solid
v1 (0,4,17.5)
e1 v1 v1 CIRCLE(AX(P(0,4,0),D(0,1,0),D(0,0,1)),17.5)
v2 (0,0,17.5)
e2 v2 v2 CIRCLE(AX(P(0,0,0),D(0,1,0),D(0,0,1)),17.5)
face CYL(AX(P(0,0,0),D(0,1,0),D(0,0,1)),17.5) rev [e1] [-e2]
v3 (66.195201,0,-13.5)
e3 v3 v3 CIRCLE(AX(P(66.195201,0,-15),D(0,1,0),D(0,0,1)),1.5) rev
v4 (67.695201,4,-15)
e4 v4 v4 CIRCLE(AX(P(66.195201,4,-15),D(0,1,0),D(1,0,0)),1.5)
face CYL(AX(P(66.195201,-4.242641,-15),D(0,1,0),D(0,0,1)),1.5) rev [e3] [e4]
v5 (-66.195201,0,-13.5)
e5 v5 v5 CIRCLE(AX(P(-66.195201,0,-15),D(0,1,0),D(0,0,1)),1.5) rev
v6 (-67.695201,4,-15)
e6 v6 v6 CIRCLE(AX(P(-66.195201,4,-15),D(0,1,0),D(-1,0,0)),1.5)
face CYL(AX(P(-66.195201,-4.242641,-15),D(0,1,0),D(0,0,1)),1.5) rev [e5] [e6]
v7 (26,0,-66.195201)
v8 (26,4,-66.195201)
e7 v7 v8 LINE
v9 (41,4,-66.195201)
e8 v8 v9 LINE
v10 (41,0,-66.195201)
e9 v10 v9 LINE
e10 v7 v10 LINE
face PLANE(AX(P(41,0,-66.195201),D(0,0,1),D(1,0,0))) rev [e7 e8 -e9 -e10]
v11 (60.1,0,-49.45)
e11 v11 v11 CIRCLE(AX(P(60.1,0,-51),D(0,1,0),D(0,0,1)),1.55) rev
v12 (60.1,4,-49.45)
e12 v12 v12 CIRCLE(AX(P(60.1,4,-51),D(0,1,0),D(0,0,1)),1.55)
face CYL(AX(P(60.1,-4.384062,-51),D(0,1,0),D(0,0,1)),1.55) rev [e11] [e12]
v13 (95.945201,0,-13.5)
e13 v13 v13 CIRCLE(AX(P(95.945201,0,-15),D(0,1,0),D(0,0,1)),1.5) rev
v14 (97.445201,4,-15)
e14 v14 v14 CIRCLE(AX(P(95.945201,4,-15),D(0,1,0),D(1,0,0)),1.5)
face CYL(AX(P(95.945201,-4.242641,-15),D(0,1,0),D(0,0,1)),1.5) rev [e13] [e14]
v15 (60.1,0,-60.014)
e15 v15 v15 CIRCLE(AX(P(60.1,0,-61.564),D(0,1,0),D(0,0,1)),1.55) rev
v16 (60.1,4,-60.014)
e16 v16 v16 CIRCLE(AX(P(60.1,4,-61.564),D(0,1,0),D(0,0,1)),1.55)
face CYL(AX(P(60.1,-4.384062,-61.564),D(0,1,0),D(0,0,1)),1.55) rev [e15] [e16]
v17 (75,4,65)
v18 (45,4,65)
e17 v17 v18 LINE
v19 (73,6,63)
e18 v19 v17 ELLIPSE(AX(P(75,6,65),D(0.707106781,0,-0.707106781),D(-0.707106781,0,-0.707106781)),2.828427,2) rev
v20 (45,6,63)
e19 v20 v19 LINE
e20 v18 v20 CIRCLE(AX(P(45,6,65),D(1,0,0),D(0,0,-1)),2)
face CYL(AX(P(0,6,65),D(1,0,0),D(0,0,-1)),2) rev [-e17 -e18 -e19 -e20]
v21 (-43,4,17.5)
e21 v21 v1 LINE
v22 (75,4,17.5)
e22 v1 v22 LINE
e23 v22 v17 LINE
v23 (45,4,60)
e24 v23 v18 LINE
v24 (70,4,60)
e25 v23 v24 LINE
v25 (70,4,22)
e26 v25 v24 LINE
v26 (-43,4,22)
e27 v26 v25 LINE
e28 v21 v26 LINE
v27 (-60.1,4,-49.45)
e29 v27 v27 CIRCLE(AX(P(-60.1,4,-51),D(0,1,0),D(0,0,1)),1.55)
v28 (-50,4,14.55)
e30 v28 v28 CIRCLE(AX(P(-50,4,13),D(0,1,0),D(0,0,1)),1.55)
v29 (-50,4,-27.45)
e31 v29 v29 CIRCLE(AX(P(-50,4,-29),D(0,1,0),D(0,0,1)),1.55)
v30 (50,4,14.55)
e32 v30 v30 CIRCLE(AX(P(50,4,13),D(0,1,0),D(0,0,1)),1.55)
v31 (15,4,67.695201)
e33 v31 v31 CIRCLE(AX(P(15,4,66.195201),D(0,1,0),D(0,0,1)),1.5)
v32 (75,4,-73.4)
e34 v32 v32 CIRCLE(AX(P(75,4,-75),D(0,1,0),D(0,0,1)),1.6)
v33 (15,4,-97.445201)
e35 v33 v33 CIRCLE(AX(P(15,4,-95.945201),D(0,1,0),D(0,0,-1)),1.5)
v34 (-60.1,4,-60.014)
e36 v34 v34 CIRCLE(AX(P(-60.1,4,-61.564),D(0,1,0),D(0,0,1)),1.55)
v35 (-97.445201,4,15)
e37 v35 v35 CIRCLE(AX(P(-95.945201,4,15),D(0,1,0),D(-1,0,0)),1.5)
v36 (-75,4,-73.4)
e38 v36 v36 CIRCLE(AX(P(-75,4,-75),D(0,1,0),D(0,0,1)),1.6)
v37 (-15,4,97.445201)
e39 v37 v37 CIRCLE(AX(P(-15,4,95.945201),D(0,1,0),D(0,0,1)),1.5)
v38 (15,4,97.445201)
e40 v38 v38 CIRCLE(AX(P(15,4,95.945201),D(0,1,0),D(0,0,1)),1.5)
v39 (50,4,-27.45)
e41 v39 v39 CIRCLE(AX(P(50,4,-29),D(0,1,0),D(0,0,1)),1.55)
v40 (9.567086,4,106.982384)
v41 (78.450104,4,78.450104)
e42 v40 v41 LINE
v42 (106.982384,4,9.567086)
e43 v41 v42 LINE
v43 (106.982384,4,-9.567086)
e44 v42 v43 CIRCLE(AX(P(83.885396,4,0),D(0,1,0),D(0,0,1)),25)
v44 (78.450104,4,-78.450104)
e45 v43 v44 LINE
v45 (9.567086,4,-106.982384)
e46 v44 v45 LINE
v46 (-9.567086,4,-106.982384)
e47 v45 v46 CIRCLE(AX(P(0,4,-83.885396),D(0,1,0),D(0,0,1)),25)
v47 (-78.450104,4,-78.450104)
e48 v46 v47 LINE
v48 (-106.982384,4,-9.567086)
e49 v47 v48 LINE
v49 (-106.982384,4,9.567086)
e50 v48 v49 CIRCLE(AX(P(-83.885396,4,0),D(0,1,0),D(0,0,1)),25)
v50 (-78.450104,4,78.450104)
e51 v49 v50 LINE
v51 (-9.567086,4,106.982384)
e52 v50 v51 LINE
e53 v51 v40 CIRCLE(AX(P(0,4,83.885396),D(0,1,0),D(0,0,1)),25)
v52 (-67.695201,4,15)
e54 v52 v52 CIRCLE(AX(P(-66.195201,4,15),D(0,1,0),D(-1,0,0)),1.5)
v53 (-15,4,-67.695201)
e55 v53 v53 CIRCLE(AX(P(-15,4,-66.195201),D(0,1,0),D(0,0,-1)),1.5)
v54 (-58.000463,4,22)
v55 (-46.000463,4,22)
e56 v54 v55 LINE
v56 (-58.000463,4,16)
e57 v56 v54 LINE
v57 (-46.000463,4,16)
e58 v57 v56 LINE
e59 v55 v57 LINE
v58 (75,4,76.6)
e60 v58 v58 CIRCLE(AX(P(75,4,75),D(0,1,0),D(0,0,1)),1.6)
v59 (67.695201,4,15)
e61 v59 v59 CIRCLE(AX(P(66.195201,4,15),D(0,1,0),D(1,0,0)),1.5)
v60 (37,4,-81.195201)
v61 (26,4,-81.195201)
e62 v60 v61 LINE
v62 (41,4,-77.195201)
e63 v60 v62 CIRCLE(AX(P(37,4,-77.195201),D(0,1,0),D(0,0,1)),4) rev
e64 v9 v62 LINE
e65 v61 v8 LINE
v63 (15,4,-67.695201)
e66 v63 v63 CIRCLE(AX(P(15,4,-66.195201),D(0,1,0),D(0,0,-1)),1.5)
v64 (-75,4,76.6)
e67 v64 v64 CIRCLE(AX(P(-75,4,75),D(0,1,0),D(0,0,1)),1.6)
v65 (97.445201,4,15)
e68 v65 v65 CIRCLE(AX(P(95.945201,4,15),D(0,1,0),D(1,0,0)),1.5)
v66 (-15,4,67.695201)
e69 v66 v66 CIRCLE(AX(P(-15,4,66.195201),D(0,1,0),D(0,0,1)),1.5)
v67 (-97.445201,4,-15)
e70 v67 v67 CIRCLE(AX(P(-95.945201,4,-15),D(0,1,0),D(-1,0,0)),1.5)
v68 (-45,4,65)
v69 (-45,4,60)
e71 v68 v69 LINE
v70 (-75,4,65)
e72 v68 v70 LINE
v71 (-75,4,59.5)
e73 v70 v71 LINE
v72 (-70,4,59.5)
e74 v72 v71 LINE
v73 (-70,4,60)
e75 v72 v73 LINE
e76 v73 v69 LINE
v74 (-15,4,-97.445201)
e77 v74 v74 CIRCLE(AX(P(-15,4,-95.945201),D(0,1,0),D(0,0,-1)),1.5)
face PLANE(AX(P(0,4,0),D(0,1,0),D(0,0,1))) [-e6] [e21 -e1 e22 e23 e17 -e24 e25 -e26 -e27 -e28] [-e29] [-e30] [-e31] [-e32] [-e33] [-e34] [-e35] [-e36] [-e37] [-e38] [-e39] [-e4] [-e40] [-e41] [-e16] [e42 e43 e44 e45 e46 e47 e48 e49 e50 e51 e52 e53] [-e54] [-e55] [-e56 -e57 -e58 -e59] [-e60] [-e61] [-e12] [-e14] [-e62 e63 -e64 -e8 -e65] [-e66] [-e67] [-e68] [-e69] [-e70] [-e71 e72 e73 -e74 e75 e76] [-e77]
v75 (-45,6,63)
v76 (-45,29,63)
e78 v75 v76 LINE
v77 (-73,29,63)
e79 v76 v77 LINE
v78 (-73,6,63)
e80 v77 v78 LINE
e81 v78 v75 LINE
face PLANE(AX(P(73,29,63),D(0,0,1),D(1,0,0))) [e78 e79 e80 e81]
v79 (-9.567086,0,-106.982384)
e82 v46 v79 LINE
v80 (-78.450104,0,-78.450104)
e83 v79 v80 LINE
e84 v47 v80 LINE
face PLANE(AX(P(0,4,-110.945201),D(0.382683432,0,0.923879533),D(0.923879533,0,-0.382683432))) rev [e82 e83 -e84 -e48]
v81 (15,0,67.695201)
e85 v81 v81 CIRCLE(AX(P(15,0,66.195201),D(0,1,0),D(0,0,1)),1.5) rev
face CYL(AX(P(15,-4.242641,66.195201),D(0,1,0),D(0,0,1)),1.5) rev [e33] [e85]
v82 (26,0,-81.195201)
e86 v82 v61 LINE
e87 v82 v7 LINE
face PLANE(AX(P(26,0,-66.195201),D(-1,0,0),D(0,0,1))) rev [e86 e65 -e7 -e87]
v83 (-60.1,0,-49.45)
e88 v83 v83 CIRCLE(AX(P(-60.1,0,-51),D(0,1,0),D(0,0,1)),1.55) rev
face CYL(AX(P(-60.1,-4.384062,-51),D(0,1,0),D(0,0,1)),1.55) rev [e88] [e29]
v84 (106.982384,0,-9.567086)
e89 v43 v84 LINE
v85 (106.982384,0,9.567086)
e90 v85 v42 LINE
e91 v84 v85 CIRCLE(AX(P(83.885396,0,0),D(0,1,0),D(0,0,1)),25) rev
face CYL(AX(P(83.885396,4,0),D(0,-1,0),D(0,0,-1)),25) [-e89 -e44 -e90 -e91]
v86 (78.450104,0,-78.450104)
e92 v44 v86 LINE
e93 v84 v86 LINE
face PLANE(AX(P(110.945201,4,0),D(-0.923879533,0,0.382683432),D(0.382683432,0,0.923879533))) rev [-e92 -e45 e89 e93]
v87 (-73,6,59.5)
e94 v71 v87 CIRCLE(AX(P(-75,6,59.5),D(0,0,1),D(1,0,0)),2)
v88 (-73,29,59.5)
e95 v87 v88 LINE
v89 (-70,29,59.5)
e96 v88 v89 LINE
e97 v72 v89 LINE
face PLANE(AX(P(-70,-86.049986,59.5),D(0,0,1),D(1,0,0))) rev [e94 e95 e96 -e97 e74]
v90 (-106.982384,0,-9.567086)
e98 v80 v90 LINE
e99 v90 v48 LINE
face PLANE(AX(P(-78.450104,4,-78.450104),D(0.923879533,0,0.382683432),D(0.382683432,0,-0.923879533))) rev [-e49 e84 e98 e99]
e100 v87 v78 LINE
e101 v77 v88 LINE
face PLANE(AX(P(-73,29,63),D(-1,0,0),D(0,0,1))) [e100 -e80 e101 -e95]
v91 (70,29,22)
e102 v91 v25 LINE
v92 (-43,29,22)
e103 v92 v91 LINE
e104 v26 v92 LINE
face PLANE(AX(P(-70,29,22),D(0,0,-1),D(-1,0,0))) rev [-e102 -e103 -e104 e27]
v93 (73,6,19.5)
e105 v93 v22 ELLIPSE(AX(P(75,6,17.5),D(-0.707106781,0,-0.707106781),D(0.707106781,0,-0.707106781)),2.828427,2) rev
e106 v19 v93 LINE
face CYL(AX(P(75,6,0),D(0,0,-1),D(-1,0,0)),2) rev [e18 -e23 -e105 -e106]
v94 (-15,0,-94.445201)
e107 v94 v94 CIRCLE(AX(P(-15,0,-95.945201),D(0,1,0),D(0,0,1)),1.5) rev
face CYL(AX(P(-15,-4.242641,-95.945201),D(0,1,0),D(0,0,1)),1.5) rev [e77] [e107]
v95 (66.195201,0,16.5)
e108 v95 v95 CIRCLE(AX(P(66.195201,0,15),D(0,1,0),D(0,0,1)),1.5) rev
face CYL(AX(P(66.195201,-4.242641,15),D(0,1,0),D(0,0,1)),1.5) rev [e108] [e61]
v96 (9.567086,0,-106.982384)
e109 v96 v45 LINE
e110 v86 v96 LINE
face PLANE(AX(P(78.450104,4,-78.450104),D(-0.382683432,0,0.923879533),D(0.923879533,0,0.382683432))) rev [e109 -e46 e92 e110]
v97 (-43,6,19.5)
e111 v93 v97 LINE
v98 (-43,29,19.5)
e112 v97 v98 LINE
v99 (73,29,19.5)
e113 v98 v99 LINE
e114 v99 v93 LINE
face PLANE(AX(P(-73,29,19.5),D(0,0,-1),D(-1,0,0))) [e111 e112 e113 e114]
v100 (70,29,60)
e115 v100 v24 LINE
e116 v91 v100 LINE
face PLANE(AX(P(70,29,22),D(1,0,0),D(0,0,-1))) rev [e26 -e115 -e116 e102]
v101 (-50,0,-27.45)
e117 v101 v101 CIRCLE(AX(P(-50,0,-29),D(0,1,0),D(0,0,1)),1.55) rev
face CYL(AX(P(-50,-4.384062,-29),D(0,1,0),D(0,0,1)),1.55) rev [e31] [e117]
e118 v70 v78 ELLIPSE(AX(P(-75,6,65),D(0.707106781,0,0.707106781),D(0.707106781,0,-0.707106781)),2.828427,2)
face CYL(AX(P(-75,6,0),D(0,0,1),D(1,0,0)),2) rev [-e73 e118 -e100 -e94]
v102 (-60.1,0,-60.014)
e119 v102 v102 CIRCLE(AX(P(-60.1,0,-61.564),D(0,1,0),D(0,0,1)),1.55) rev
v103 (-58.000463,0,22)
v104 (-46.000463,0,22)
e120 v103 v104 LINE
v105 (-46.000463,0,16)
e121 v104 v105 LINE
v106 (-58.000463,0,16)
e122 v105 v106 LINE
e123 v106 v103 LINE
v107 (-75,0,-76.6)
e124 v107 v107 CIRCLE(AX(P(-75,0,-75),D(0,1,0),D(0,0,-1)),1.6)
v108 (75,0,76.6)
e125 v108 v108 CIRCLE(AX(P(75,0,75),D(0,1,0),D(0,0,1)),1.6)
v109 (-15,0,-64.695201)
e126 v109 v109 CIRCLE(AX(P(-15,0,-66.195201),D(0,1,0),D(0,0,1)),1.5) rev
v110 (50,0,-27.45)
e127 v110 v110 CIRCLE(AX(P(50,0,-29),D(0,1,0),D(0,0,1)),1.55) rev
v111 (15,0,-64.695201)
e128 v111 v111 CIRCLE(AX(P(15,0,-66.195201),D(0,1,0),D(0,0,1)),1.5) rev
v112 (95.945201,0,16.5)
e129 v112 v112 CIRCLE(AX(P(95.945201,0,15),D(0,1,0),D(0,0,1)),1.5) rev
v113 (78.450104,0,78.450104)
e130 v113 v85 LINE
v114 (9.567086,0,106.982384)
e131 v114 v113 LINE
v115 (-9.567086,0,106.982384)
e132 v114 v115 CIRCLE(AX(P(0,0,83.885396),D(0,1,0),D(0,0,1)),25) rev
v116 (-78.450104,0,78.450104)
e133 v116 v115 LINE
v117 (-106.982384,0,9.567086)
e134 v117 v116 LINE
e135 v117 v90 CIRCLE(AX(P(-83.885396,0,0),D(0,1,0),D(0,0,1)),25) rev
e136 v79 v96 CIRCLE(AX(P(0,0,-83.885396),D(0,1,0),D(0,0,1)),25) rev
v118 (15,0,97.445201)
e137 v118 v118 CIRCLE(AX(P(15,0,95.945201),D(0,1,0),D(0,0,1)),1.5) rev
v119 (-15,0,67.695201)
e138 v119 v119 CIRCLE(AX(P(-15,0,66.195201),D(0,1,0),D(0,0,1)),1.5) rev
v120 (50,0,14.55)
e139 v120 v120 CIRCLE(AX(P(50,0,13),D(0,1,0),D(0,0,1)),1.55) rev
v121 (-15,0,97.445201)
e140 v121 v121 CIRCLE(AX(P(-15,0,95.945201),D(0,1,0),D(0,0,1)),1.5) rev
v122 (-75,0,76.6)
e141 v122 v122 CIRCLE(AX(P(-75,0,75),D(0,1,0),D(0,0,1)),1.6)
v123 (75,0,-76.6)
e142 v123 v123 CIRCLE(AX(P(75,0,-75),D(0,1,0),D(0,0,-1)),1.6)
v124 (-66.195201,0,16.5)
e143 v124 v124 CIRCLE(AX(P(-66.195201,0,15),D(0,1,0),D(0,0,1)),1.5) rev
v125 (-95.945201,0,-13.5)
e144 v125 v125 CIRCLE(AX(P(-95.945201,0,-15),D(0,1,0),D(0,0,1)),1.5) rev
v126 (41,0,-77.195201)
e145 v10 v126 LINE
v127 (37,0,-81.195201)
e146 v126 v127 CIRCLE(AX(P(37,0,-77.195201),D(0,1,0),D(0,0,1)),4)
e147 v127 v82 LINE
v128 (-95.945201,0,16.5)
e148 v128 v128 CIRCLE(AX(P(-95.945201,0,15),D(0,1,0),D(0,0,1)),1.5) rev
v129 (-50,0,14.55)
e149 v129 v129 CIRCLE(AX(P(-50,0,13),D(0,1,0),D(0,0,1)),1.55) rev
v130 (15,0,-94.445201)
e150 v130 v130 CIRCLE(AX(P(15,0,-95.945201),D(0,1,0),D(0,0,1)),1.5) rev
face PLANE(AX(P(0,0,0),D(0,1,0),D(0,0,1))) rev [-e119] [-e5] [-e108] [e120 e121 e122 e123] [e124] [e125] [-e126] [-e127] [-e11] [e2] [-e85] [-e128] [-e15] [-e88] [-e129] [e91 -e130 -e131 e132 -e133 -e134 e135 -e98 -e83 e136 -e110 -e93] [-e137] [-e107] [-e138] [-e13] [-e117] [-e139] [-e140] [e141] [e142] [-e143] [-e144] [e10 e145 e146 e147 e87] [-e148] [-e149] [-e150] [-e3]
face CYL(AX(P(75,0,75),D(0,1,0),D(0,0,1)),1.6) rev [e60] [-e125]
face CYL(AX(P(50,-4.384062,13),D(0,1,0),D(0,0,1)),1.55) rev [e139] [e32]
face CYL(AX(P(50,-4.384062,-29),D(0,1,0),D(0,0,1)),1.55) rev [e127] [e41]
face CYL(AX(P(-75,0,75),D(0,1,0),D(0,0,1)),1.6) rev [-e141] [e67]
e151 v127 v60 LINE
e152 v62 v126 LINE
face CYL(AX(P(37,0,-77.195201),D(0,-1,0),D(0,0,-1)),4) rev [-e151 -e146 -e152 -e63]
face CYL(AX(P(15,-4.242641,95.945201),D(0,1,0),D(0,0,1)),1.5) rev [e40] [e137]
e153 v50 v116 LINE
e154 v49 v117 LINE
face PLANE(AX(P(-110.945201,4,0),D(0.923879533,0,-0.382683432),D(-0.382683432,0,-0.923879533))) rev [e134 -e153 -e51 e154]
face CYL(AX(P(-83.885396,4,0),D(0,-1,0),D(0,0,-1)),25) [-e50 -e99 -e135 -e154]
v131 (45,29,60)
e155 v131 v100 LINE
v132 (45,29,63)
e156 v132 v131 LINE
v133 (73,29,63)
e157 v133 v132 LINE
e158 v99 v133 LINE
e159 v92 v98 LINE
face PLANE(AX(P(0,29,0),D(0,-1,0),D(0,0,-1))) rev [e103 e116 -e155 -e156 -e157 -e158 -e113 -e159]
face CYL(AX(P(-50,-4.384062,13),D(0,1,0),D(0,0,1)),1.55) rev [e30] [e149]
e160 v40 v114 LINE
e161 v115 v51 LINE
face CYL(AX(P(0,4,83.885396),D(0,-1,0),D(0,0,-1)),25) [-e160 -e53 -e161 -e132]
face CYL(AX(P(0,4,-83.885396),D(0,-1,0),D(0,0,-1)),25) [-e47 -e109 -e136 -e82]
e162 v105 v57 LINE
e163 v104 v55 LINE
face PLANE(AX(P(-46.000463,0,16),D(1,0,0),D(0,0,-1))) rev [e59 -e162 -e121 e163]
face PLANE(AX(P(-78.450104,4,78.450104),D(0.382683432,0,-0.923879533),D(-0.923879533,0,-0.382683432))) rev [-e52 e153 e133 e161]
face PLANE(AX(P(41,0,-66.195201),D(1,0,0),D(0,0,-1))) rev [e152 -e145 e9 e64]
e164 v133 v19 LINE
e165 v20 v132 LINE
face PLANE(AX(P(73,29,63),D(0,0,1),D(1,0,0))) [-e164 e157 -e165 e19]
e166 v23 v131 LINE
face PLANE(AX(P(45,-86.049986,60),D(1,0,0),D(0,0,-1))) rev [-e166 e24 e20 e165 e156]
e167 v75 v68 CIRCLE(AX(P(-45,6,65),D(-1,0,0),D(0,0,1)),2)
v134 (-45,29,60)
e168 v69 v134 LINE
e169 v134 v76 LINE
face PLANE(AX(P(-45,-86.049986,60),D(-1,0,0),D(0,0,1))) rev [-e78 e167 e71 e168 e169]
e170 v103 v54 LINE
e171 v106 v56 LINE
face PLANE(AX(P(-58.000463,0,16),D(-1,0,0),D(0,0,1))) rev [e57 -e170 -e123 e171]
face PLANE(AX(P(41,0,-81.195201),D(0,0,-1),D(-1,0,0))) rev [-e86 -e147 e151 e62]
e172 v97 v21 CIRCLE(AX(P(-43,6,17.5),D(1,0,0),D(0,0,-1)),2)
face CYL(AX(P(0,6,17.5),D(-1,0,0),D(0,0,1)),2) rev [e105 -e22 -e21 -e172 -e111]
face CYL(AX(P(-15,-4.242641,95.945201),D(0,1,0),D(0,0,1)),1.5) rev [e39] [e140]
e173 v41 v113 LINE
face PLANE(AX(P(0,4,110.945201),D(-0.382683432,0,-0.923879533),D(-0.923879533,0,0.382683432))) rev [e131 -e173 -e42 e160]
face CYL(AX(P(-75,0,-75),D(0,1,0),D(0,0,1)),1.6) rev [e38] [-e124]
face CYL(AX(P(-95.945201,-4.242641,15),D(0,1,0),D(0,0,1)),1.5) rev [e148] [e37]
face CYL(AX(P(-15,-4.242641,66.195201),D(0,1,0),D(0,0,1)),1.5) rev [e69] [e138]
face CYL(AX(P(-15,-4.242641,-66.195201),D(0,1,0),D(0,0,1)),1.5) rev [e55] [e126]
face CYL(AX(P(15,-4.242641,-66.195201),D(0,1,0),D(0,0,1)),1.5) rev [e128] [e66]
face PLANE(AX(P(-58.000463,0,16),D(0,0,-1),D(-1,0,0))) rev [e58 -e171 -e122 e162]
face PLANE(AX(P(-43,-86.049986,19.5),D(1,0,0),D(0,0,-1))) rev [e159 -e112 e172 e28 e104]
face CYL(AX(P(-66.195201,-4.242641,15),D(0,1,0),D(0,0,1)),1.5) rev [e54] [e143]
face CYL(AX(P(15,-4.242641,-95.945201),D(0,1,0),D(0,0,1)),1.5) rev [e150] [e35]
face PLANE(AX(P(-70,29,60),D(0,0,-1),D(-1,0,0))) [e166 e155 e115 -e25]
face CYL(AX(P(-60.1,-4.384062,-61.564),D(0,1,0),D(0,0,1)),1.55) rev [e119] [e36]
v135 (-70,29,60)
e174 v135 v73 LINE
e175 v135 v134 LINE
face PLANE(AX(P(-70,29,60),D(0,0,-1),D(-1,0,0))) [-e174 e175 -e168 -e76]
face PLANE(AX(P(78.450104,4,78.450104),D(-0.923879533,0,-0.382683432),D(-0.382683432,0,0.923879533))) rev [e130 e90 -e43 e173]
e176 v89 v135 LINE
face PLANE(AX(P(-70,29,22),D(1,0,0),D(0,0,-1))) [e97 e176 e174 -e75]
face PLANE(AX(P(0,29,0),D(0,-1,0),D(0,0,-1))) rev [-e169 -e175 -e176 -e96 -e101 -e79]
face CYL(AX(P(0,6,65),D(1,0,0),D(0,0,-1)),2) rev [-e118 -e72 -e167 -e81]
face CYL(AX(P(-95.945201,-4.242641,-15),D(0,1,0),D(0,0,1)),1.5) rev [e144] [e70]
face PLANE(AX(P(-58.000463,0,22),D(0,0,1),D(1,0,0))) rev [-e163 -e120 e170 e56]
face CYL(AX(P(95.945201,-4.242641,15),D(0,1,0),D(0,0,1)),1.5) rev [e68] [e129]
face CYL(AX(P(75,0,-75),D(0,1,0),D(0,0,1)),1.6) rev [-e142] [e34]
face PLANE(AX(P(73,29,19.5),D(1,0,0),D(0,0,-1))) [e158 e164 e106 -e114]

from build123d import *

# Parameters (mm, degrees)
BOSS_EXTRUDE2_DEPTH      = 4
CUT_EXTRUDE3_DEPTH       = 157.951186811
CUT_EXTRUDE3_DEPTH_BACK  = 157.951186811
SKETCH3_R                = 1.6
CUT_EXTRUDE6_DEPTH       = 157.951186811
CUT_EXTRUDE6_DEPTH_BACK  = 157.951186811
SKETCH6_R                = 17.5
SKETCH8_R                = 1.5
CUT_EXTRUDE7_DEPTH       = 4
CIRPATTERN1_COUNT        = 4
SKETCH10_R               = 1.55
CUT_EXTRUDE8_DEPTH       = 4
SKETCH11_W               = 146
SKETCH11_H               = 43.5
SKETCH11_W_2             = 140
SKETCH11_H_2             = 38
BOSS_EXTRUDE4_DEPTH      = 25
SKETCH12_W               = 90
SKETCH12_H               = 3
CUT_EXTRUDE9_DEPTH       = 25
FILLET1_R                = 2
SKETCH19_W               = 12
SKETCH19_H               = 6
CUT_EXTRUDE11_DEPTH      = 159.879435552
CUT_EXTRUDE12_DEPTH      = 159.879435552
CUT_EXTRUDE12_DEPTH_BACK = 159.879435552
SKETCH20_W               = 15
SKETCH20_H               = 15
FILLET2_R                = 25
FILLET3_R                = 4


with BuildPart() as part:
    # Sketch1 → Boss-Extrude2 (new body)
    with BuildSketch(Plane(origin=(0, 0, 0), x_dir=(1, 0, 0), z_dir=(0, 1, 0))):
        Polygon((0, -110.94520053), (78.450103635, -78.450103635), (110.94520053, 0), (78.450103635, 78.450103635), (0, 110.94520053), (-78.450103635, 78.450103635), (-110.94520053, 0), (-78.450103635, -78.450103635), align=None)
    extrude(amount=BOSS_EXTRUDE2_DEPTH)

    # Sketch3 → Cut-Extrude3 (cut, two sides: drawn at the far end of the back side and taken through both)
    with BuildSketch(Plane(origin=(0, 4, 0), x_dir=(1, 0, 0), z_dir=(0, 1, 0)).offset(-CUT_EXTRUDE3_DEPTH_BACK)):
        with Locations(Location((-75, -75, 0), (0, 0, 270))):
            Circle(SKETCH3_R)
        with Locations(Location((75, -75, 0), (0, 0, 270))):
            Circle(SKETCH3_R)
        with Locations(Location((75, 75, 0), (0, 0, 270))):
            Circle(SKETCH3_R)
        with Locations(Location((-75, 75, 0), (0, 0, 270))):
            Circle(SKETCH3_R)
    extrude(amount=CUT_EXTRUDE3_DEPTH + CUT_EXTRUDE3_DEPTH_BACK, mode=Mode.SUBTRACT)

    # Sketch6 → Cut-Extrude6 (cut, two sides: drawn at the far end of the back side and taken through both)
    with BuildSketch(Plane(origin=(0, 4, 0), x_dir=(1, 0, 0), z_dir=(0, 1, 0)).offset(-CUT_EXTRUDE6_DEPTH_BACK)):
        with Locations(Location((0, 0, 0), (0, 0, 270))):
            Circle(SKETCH6_R)
    extrude(amount=CUT_EXTRUDE6_DEPTH + CUT_EXTRUDE6_DEPTH_BACK, mode=Mode.SUBTRACT)

    # Sketch8 → Cut-Extrude7 (cut)
    with BuildSketch(Plane(origin=(0, 4, 0), x_dir=(1, 0, 0), z_dir=(0, 1, 0))):
        with Locations(Location((-15, -66.19520053, 0), (0, 0, 270))):
            Circle(SKETCH8_R)
        with Locations(Location((15, -66.19520053, 0), (0, 0, 270))):
            Circle(SKETCH8_R)
        with Locations(Location((-15, -95.94520053, 0), (0, 0, 270))):
            Circle(SKETCH8_R)
        with Locations(Location((15, -95.94520053, 0), (0, 0, 270))):
            Circle(SKETCH8_R)
    cut_extrude7 = extrude(amount=-CUT_EXTRUDE7_DEPTH, mode=Mode.SUBTRACT)

    # CirPattern1: Cut-Extrude7 ×4 about axis
    cirpattern1_axis = Axis((0, 0, 0), (0, 1, 0))
    for i in range(1, CIRPATTERN1_COUNT):
        add(cut_extrude7.rotate(cirpattern1_axis, i * 360 / CIRPATTERN1_COUNT), mode=Mode.SUBTRACT)

    # Sketch10 → Cut-Extrude8 (cut)
    with BuildSketch(Plane(origin=(0, 4, 0), x_dir=(1, 0, 0), z_dir=(0, 1, 0))):
        with Locations(Location((-50, 29, 0), (0, 0, 270))):
            Circle(SKETCH10_R)
        with Locations(Location((-50, -13, 0), (0, 0, 270))):
            Circle(SKETCH10_R)
        with Locations(Location((50, -13, 0), (0, 0, 270))):
            Circle(SKETCH10_R)
        with Locations(Location((50, 29, 0), (0, 0, 270))):
            Circle(SKETCH10_R)
        with Locations(Location((60.1, 51, 0), (0, 0, 270))):
            Circle(SKETCH10_R)
        with Locations(Location((-60.1, 61.564, 0), (0, 0, 270))):
            Circle(SKETCH10_R)
        with Locations(Location((60.1, 61.564, 0), (0, 0, 270))):
            Circle(SKETCH10_R)
        with Locations(Location((-60.1, 51, 0), (0, 0, 270))):
            Circle(SKETCH10_R)
    extrude(amount=-CUT_EXTRUDE8_DEPTH, mode=Mode.SUBTRACT)

    # Sketch11 → Boss-Extrude4 (add)
    with BuildSketch(Plane(origin=(0, 4, 0), x_dir=(1, 0, 0), z_dir=(0, 1, 0))):
        with Locations((0, -41.25)):
            Rectangle(SKETCH11_W, SKETCH11_H)
        with Locations((0, -41)):
            Rectangle(SKETCH11_W_2, SKETCH11_H_2, mode=Mode.SUBTRACT)
    extrude(amount=BOSS_EXTRUDE4_DEPTH)

    # Sketch12 → Cut-Extrude9 (cut)
    with BuildSketch(Plane(origin=(0, 29, 0), x_dir=(1, 0, 0), z_dir=(0, 1, 0))):
        Polygon((-73, -19.5), (-43, -19.5), (-43, -22), (-70, -22), (-70, -59.5), (-73, -59.5), align=None)
        with Locations((0, -61.5)):
            Rectangle(SKETCH12_W, SKETCH12_H)
    extrude(amount=-CUT_EXTRUDE9_DEPTH, mode=Mode.SUBTRACT)

    # Fillet1
    fillet1_edges = [part.edges().sort_by_distance(p)[0] for p in [
        (59, 4, 63),
        (-73, 4, 61.25),
        (73, 4, 41.25),
        (15, 4, 19.5),
        (-59, 4, 63),
    ]]
    fillet(fillet1_edges, radius=FILLET1_R - 0.0001)  # a hair under: the kernel refuses the full size

    # Sketch19 → Cut-Extrude11 (cut, through all)
    with BuildSketch(Plane(origin=(0, 4, 0), x_dir=(1, 0, 0), z_dir=(0, 1, 0))):
        with Locations((-52.000462783, -19)):
            Rectangle(SKETCH19_W, SKETCH19_H)
    extrude(amount=-CUT_EXTRUDE11_DEPTH, mode=Mode.SUBTRACT)

    # Sketch20 → Cut-Extrude12 (cut, two sides: drawn at the far end of the back side and taken through both)
    with BuildSketch(Plane(origin=(0, 4, 0), x_dir=(1, 0, 0), z_dir=(0, 1, 0)).offset(-CUT_EXTRUDE12_DEPTH_BACK)):
        with Locations((33.5, 73.69520053)):
            Rectangle(SKETCH20_W, SKETCH20_H)
    extrude(amount=CUT_EXTRUDE12_DEPTH + CUT_EXTRUDE12_DEPTH_BACK, mode=Mode.SUBTRACT)

    # Fillet2
    fillet2_edges = [part.edges().sort_by_distance(p)[0] for p in [
        (-110.94520053, 2, 0),
        (0, 2, -110.94520053),
        (110.94520053, 2, 0),
        (0, 2, 110.94520053),
    ]]
    fillet(fillet2_edges, radius=FILLET2_R)

    # Fillet3
    fillet3_edges = [part.edges().sort_by_distance(p)[0] for p in [
        (41, 2, -81.19520053),
    ]]
    fillet(fillet3_edges, radius=FILLET3_R)


solid = part.part
